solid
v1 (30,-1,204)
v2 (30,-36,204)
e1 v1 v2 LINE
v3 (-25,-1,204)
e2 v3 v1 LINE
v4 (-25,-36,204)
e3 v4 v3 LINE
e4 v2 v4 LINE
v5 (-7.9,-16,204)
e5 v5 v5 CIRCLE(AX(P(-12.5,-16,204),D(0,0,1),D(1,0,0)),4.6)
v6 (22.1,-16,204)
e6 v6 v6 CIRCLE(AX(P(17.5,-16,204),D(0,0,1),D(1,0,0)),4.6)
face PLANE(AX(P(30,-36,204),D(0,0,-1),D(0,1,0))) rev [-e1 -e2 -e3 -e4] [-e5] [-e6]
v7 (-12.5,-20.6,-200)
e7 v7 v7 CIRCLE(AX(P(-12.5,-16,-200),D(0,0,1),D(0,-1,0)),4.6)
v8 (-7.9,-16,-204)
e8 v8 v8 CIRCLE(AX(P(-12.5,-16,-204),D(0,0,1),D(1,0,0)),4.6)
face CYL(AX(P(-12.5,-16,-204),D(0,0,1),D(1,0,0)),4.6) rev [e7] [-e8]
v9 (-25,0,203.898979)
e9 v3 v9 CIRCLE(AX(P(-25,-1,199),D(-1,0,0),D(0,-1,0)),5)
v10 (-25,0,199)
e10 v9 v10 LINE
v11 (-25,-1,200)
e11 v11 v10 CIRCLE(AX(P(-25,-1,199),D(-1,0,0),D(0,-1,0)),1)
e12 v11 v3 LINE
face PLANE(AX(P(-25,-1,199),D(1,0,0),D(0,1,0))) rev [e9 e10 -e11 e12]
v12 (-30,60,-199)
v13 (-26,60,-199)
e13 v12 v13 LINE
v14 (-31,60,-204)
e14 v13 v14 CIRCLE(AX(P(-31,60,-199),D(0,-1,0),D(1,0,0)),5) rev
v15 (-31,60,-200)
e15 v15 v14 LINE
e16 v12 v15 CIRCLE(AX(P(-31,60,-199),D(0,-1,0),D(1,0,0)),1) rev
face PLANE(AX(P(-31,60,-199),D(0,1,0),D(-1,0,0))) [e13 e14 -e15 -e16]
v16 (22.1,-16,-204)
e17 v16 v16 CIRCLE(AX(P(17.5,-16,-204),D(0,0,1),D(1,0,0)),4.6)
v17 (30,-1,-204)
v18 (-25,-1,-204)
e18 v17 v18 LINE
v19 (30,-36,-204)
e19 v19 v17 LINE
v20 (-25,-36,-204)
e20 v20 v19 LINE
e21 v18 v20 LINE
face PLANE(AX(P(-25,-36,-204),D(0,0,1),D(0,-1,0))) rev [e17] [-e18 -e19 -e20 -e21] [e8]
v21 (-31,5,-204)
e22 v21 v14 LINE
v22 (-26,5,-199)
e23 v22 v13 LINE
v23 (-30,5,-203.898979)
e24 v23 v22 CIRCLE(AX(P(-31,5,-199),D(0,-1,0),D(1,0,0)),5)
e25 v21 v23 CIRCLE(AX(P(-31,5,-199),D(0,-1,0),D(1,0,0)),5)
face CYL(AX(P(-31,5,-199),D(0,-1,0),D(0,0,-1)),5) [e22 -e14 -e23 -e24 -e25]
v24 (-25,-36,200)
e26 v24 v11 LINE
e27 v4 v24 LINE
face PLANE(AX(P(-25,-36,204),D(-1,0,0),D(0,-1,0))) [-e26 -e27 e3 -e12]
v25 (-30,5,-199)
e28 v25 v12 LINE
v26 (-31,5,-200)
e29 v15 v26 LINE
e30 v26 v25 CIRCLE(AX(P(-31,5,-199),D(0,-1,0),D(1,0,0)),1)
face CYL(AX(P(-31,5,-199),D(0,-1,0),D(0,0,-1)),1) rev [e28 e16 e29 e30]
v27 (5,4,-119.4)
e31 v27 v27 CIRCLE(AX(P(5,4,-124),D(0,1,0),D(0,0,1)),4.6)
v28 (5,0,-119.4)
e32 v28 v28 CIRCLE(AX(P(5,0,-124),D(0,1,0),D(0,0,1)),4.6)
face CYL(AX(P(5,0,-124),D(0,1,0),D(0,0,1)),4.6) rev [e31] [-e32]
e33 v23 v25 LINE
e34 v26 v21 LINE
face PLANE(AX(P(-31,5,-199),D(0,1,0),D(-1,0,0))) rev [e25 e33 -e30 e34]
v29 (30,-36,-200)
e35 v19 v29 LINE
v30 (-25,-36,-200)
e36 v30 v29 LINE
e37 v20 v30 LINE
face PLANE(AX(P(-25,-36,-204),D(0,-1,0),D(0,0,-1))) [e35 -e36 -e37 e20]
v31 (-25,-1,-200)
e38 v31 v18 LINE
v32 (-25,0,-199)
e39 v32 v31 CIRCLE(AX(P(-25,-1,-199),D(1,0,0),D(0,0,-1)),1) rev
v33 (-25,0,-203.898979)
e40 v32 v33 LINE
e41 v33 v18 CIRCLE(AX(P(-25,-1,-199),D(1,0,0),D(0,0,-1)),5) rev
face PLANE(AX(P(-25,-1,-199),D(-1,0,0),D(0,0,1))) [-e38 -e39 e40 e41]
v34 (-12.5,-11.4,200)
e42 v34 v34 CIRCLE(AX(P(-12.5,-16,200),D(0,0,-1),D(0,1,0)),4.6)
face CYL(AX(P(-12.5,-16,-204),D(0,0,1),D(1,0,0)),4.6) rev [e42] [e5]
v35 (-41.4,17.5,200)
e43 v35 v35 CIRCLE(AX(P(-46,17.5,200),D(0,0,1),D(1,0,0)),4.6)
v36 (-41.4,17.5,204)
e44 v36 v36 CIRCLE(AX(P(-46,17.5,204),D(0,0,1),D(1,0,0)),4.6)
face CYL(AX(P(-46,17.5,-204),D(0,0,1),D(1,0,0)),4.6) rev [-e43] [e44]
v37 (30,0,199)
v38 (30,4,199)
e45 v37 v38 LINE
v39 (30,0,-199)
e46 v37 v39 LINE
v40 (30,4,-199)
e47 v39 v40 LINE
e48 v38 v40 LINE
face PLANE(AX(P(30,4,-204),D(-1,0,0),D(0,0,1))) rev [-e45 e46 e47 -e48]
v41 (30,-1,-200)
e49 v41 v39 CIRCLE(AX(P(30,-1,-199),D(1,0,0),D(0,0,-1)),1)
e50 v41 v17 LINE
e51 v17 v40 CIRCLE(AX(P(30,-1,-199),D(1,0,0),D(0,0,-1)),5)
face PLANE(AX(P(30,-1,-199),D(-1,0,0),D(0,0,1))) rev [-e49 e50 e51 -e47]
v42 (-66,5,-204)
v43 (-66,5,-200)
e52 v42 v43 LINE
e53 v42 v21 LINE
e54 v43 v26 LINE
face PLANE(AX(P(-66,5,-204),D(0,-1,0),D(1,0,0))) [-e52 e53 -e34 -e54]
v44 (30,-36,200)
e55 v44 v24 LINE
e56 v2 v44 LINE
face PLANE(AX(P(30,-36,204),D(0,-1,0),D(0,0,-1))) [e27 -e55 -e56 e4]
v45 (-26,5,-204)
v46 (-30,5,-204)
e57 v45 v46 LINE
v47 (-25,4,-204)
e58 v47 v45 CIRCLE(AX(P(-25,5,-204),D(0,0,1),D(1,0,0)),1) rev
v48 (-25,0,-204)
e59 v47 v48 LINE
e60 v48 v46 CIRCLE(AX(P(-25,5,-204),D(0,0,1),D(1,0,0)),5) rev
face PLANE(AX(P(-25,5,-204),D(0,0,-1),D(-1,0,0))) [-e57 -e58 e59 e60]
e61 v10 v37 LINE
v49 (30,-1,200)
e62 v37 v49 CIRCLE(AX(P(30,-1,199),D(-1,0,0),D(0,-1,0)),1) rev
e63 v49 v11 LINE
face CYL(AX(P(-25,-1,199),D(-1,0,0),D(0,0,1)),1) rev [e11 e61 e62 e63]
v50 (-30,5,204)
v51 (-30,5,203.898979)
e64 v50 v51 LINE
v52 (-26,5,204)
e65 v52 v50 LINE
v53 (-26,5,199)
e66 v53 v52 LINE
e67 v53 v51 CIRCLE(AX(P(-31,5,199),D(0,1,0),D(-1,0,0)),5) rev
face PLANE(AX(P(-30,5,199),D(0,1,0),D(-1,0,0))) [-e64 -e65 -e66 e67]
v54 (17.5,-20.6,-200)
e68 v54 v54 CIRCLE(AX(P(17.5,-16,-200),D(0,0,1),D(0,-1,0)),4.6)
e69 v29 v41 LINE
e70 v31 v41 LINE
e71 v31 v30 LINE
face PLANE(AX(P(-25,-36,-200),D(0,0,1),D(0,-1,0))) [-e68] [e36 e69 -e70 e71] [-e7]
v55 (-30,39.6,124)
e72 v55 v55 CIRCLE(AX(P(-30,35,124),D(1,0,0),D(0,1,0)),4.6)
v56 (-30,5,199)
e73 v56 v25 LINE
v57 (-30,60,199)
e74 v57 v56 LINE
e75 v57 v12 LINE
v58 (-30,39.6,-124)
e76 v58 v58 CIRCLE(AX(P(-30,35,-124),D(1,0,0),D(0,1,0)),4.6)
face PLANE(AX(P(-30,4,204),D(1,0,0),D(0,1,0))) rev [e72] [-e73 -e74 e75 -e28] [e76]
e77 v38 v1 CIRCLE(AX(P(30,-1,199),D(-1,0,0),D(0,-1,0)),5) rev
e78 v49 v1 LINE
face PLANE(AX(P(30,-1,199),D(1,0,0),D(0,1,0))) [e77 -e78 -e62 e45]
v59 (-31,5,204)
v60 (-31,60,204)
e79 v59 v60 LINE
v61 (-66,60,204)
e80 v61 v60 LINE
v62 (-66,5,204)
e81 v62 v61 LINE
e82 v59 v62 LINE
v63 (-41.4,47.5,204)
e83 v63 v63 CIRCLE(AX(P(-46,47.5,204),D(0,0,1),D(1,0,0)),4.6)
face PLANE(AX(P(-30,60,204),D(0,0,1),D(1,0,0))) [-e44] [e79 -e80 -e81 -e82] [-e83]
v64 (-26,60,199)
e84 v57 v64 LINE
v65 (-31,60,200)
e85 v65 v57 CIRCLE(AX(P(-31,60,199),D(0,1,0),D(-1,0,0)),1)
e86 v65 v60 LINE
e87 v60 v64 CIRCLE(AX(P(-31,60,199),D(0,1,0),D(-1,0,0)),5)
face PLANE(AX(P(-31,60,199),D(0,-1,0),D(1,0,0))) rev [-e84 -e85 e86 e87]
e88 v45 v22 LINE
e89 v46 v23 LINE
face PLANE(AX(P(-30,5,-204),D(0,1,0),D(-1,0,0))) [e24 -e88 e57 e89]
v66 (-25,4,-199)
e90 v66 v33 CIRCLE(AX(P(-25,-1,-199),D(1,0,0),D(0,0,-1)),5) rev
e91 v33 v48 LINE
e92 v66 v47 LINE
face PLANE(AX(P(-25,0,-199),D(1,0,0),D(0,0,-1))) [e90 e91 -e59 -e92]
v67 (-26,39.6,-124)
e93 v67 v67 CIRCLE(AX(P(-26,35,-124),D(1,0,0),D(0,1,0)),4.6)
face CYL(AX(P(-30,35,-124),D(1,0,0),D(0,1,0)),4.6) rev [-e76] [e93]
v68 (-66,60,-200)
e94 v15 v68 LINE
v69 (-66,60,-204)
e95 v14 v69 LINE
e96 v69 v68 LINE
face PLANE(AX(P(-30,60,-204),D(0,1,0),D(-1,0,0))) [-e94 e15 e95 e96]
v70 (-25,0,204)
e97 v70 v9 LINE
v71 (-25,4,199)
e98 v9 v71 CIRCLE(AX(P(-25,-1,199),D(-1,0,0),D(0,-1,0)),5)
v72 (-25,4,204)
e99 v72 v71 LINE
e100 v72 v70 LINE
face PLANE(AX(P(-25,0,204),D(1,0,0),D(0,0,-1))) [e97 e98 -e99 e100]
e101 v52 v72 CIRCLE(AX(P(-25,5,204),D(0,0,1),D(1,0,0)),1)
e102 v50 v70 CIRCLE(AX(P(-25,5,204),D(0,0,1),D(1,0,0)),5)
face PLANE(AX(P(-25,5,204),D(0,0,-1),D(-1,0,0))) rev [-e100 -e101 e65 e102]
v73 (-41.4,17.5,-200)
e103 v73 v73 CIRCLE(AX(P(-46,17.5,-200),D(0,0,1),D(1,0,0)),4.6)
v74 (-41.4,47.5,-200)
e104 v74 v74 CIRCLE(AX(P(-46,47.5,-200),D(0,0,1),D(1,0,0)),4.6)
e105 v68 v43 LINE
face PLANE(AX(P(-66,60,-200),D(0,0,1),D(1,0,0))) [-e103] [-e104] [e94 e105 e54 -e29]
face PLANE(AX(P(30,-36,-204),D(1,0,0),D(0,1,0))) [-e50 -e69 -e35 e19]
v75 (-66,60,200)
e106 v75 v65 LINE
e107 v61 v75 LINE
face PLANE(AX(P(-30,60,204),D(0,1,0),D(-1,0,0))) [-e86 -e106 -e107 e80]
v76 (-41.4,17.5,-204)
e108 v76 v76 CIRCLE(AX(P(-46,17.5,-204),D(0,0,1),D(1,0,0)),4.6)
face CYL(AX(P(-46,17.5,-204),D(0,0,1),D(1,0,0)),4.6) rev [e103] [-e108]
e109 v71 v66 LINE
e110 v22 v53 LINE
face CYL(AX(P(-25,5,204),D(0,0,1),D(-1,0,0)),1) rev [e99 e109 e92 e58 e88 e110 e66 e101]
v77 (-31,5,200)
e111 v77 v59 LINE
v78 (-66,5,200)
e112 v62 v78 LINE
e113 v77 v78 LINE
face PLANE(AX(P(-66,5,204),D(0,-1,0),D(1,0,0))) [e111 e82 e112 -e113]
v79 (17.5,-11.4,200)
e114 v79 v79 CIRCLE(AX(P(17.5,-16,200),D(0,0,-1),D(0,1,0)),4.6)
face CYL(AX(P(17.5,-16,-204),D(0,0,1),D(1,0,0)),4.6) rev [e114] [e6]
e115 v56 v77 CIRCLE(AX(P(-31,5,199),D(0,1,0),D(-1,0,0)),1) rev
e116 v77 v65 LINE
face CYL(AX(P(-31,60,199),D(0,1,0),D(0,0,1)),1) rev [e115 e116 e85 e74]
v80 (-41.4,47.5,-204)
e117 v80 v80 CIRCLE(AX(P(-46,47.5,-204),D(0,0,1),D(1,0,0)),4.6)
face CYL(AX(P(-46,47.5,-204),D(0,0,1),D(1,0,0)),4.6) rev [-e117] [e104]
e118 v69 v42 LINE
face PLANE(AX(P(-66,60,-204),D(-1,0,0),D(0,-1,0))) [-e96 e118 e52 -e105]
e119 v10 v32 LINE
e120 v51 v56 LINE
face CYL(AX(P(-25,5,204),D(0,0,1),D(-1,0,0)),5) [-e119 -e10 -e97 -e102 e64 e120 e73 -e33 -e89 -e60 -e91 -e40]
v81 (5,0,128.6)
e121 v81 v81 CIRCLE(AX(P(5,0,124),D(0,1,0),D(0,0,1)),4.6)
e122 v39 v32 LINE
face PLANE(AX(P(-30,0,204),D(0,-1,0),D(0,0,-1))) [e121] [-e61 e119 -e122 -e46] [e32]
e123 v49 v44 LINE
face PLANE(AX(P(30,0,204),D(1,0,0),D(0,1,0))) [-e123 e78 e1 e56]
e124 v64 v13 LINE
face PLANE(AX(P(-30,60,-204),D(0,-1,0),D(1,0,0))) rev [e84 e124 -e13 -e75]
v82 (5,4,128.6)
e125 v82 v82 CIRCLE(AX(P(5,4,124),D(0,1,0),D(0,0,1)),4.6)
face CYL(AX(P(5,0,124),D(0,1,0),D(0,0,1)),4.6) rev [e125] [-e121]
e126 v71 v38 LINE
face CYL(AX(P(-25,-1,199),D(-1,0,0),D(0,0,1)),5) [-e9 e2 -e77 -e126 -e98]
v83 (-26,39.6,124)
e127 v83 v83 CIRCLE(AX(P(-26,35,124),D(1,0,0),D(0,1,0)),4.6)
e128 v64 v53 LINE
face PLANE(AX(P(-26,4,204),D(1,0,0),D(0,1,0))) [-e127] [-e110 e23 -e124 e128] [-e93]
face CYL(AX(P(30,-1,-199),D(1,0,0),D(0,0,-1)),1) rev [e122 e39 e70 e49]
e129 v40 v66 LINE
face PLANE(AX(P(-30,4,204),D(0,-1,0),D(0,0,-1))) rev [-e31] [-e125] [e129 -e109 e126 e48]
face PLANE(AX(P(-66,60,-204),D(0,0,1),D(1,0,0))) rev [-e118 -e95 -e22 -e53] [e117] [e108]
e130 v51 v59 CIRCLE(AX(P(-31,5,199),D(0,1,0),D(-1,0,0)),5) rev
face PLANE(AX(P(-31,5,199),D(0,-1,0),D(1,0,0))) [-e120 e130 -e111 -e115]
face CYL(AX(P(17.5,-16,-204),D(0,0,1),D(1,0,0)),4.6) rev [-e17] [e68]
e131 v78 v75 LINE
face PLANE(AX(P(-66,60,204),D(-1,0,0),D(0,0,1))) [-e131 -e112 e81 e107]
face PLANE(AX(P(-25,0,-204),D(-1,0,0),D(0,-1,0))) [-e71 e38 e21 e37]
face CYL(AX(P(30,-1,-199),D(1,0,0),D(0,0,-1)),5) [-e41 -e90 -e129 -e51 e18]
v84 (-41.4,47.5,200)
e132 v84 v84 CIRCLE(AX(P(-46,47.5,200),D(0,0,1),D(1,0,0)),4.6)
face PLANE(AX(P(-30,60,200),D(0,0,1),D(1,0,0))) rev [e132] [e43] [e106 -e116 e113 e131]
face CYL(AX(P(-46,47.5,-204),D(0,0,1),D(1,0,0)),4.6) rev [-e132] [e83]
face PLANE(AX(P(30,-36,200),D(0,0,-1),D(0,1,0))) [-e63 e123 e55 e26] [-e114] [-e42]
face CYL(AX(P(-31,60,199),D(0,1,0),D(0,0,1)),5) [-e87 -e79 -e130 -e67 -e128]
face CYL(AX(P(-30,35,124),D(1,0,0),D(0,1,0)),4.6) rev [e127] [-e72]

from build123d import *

# Parameters (mm, degrees)
SKETCH1_W                      = 60
SKETCH1_H                      = 408
BASE_FLANGE1_DEPTH             = 4
EDGE_FLANGE1_STRIP_W           = 18
EDGE_FLANGE1_STRIP_H           = 4
EDGE_FLANGE1_STRIP_CUT_DEPTH   = 408
EDGE_FLANGE1_DEPTH             = 408
EDGE_FLANGE2_STRIP_W           = 18
EDGE_FLANGE2_STRIP_H           = 4
EDGE_FLANGE2_STRIP_CUT_DEPTH   = 55
EDGE_FLANGE2_STRIP_2_W         = 18
EDGE_FLANGE2_STRIP_2_H         = 4
EDGE_FLANGE2_STRIP_CUT_2_DEPTH = 55
EDGE_FLANGE2_STRIP_3_W         = 18
EDGE_FLANGE2_STRIP_3_H         = 4
EDGE_FLANGE2_STRIP_CUT_3_DEPTH = 55
EDGE_FLANGE2_STRIP_4_W         = 18
EDGE_FLANGE2_STRIP_4_H         = 4
EDGE_FLANGE2_STRIP_CUT_4_DEPTH = 55
EDGE_FLANGE2_DEPTH             = 55
EDGE_FLANGE2_BEND_DEPTH        = 55
EDGE_FLANGE2_BEND_2_DEPTH      = 55
EDGE_FLANGE2_BEND_3_DEPTH      = 55
SKETCH18_R                     = 4.6
EXTRUDE1_DEPTH                 = 418.636205327
SKETCH19_R                     = 4.6
EXTRUDE2_DEPTH                 = 4
SKETCH20_R                     = 4.6
EXTRUDE3_DEPTH                 = 4


# Sheet-metal steps are written as plain solids
with BuildPart() as part:
    # Sketch1 → Base-Flange1 (new body)
    with BuildSketch(Plane(origin=(0, 0, 0), x_dir=(1, 0, 0), z_dir=(0, 1, 0))):
        Rectangle(SKETCH1_W, SKETCH1_H)
    extrude(amount=BASE_FLANGE1_DEPTH)

    # Edge-Flange1 strip (across the edge) → Edge-Flange1 strip cut (cut)
    with BuildSketch(Plane(origin=(-30, 4, -204), x_dir=(1, 0, 0), z_dir=(0, 0, 1))):
        with Locations((-4, -2)):
            Rectangle(EDGE_FLANGE1_STRIP_W, EDGE_FLANGE1_STRIP_H)
    extrude(amount=EDGE_FLANGE1_STRIP_CUT_DEPTH, mode=Mode.SUBTRACT)

    # Edge-Flange1 section (across the edge) → Edge-Flange1 (add)
    with BuildSketch(Plane(origin=(-30, 4, -204), x_dir=(1, 0, 0), z_dir=(0, 0, 1))):
        with BuildLine():
            Line((0, 1), (0, 56))
            Line((0, 56), (4, 56))
            Line((4, 56), (4, 1))
            ThreePointArc((4, 1), (4.292893219, 0.292893219), (5, 0))
            Line((5, 0), (5, -4))
            ThreePointArc((5, -4), (1.464466094, -2.535533906), (0, 1))
        make_face()
    extrude(amount=EDGE_FLANGE1_DEPTH)

    # Edge-Flange2 strip (across the edge) → Edge-Flange2 strip cut (cut)
    with BuildSketch(Plane(origin=(-30, 5, 204), x_dir=(0, 0, -1), z_dir=(0, 1, 0))):
        with Locations((-4, -2)):
            Rectangle(EDGE_FLANGE2_STRIP_W, EDGE_FLANGE2_STRIP_H)
    extrude(amount=EDGE_FLANGE2_STRIP_CUT_DEPTH, mode=Mode.SUBTRACT)

    # Edge-Flange2 strip 2 (across the edge) → Edge-Flange2 strip cut 2 (cut)
    with BuildSketch(Plane(origin=(30, 0, 204), x_dir=(0, 0, -1), z_dir=(-1, 0, 0))):
        with Locations((-4, -2)):
            Rectangle(EDGE_FLANGE2_STRIP_2_W, EDGE_FLANGE2_STRIP_2_H)
    extrude(amount=EDGE_FLANGE2_STRIP_CUT_2_DEPTH, mode=Mode.SUBTRACT)

    # Edge-Flange2 strip 3 (across the edge) → Edge-Flange2 strip cut 3 (cut)
    with BuildSketch(Plane(origin=(-30, 60, -204), x_dir=(0, 0, 1), z_dir=(0, -1, 0))):
        with Locations((-4, -2)):
            Rectangle(EDGE_FLANGE2_STRIP_3_W, EDGE_FLANGE2_STRIP_3_H)
    extrude(amount=EDGE_FLANGE2_STRIP_CUT_3_DEPTH, mode=Mode.SUBTRACT)

    # Edge-Flange2 strip 4 (across the edge) → Edge-Flange2 strip cut 4 (cut)
    with BuildSketch(Plane(origin=(-25, 0, -204), x_dir=(0, 0, 1), z_dir=(1, 0, 0))):
        with Locations((-4, -2)):
            Rectangle(EDGE_FLANGE2_STRIP_4_W, EDGE_FLANGE2_STRIP_4_H)
    extrude(amount=EDGE_FLANGE2_STRIP_CUT_4_DEPTH, mode=Mode.SUBTRACT)

    # Edge-Flange2 section (across the edge) → Edge-Flange2 (add)
    with BuildSketch(Plane(origin=(-30, 5, 204), x_dir=(0, 0, -1), z_dir=(0, 1, 0))):
        with BuildLine():
            Line((0, 1), (0, 36))
            Line((0, 36), (4, 36))
            Line((4, 36), (4, 1))
            ThreePointArc((4, 1), (4.292893219, 0.292893219), (5, 0))
            Line((5, 0), (5, -4))
            ThreePointArc((5, -4), (1.464466094, -2.535533906), (0, 1))
        make_face()
    extrude(amount=EDGE_FLANGE2_DEPTH)

    # Edge-Flange2 section 2 (across the edge) → Edge-Flange2 bend (add)
    with BuildSketch(Plane(origin=(30, 0, 204), x_dir=(0, 0, -1), z_dir=(-1, 0, 0))):
        with BuildLine():
            Line((0, 1), (0, 36))
            Line((0, 36), (4, 36))
            Line((4, 36), (4, 1))
            ThreePointArc((4, 1), (4.292893219, 0.292893219), (5, 0))
            Line((5, 0), (5, -4))
            ThreePointArc((5, -4), (1.464466094, -2.535533906), (0, 1))
        make_face()
    extrude(amount=EDGE_FLANGE2_BEND_DEPTH)

    # Edge-Flange2 section 3 (across the edge) → Edge-Flange2 bend 2 (add)
    with BuildSketch(Plane(origin=(-30, 60, -204), x_dir=(0, 0, 1), z_dir=(0, -1, 0))):
        with BuildLine():
            Line((0, 1), (0, 36))
            Line((0, 36), (4, 36))
            Line((4, 36), (4, 1))
            ThreePointArc((4, 1), (4.292893219, 0.292893219), (5, 0))
            Line((5, 0), (5, -4))
            ThreePointArc((5, -4), (1.464466094, -2.535533906), (0, 1))
        make_face()
    extrude(amount=EDGE_FLANGE2_BEND_2_DEPTH)

    # Edge-Flange2 section 4 (across the edge) → Edge-Flange2 bend 3 (add)
    with BuildSketch(Plane(origin=(-25, 0, -204), x_dir=(0, 0, 1), z_dir=(1, 0, 0))):
        with BuildLine():
            Line((0, 1), (0, 36))
            Line((0, 36), (4, 36))
            Line((4, 36), (4, 1))
            ThreePointArc((4, 1), (4.292893219, 0.292893219), (5, 0))
            Line((5, 0), (5, -4))
            ThreePointArc((5, -4), (1.464466094, -2.535533906), (0, 1))
        make_face()
    extrude(amount=EDGE_FLANGE2_BEND_3_DEPTH)

    # Sketch18 → Extrude1 (cut, through all)
    with BuildSketch(Plane.XY.offset(204)):
        with Locations((-46, 47.5)):
            Circle(SKETCH18_R)
        with Locations((-46, 17.5)):
            Circle(SKETCH18_R)
        with Locations((-12.5, -16)):
            Circle(SKETCH18_R)
        with Locations((17.5, -16)):
            Circle(SKETCH18_R)
    extrude(amount=-EXTRUDE1_DEPTH, mode=Mode.SUBTRACT)

    # Sketch19 → Extrude2 (cut)
    with BuildSketch(Plane(origin=(-26, 0, 0), x_dir=(0, 0, -1), z_dir=(1, 0, 0))):
        with Locations(Location((-124, 35, 0), (0, 0, 90))):
            Circle(SKETCH19_R)
        with Locations(Location((124, 35, 0), (0, 0, 90))):
            Circle(SKETCH19_R)
    extrude(amount=-EXTRUDE2_DEPTH, mode=Mode.SUBTRACT)

    # Sketch20 → Extrude3 (cut)
    with BuildSketch(Plane(origin=(0, 4, 0), x_dir=(1, 0, 0), z_dir=(0, 1, 0))):
        with Locations(Location((5, 124, 0), (0, 0, 270))):
            Circle(SKETCH20_R)
        with Locations(Location((5, -124, 0), (0, 0, 270))):
            Circle(SKETCH20_R)
    extrude(amount=-EXTRUDE3_DEPTH, mode=Mode.SUBTRACT)


solid = part.part
